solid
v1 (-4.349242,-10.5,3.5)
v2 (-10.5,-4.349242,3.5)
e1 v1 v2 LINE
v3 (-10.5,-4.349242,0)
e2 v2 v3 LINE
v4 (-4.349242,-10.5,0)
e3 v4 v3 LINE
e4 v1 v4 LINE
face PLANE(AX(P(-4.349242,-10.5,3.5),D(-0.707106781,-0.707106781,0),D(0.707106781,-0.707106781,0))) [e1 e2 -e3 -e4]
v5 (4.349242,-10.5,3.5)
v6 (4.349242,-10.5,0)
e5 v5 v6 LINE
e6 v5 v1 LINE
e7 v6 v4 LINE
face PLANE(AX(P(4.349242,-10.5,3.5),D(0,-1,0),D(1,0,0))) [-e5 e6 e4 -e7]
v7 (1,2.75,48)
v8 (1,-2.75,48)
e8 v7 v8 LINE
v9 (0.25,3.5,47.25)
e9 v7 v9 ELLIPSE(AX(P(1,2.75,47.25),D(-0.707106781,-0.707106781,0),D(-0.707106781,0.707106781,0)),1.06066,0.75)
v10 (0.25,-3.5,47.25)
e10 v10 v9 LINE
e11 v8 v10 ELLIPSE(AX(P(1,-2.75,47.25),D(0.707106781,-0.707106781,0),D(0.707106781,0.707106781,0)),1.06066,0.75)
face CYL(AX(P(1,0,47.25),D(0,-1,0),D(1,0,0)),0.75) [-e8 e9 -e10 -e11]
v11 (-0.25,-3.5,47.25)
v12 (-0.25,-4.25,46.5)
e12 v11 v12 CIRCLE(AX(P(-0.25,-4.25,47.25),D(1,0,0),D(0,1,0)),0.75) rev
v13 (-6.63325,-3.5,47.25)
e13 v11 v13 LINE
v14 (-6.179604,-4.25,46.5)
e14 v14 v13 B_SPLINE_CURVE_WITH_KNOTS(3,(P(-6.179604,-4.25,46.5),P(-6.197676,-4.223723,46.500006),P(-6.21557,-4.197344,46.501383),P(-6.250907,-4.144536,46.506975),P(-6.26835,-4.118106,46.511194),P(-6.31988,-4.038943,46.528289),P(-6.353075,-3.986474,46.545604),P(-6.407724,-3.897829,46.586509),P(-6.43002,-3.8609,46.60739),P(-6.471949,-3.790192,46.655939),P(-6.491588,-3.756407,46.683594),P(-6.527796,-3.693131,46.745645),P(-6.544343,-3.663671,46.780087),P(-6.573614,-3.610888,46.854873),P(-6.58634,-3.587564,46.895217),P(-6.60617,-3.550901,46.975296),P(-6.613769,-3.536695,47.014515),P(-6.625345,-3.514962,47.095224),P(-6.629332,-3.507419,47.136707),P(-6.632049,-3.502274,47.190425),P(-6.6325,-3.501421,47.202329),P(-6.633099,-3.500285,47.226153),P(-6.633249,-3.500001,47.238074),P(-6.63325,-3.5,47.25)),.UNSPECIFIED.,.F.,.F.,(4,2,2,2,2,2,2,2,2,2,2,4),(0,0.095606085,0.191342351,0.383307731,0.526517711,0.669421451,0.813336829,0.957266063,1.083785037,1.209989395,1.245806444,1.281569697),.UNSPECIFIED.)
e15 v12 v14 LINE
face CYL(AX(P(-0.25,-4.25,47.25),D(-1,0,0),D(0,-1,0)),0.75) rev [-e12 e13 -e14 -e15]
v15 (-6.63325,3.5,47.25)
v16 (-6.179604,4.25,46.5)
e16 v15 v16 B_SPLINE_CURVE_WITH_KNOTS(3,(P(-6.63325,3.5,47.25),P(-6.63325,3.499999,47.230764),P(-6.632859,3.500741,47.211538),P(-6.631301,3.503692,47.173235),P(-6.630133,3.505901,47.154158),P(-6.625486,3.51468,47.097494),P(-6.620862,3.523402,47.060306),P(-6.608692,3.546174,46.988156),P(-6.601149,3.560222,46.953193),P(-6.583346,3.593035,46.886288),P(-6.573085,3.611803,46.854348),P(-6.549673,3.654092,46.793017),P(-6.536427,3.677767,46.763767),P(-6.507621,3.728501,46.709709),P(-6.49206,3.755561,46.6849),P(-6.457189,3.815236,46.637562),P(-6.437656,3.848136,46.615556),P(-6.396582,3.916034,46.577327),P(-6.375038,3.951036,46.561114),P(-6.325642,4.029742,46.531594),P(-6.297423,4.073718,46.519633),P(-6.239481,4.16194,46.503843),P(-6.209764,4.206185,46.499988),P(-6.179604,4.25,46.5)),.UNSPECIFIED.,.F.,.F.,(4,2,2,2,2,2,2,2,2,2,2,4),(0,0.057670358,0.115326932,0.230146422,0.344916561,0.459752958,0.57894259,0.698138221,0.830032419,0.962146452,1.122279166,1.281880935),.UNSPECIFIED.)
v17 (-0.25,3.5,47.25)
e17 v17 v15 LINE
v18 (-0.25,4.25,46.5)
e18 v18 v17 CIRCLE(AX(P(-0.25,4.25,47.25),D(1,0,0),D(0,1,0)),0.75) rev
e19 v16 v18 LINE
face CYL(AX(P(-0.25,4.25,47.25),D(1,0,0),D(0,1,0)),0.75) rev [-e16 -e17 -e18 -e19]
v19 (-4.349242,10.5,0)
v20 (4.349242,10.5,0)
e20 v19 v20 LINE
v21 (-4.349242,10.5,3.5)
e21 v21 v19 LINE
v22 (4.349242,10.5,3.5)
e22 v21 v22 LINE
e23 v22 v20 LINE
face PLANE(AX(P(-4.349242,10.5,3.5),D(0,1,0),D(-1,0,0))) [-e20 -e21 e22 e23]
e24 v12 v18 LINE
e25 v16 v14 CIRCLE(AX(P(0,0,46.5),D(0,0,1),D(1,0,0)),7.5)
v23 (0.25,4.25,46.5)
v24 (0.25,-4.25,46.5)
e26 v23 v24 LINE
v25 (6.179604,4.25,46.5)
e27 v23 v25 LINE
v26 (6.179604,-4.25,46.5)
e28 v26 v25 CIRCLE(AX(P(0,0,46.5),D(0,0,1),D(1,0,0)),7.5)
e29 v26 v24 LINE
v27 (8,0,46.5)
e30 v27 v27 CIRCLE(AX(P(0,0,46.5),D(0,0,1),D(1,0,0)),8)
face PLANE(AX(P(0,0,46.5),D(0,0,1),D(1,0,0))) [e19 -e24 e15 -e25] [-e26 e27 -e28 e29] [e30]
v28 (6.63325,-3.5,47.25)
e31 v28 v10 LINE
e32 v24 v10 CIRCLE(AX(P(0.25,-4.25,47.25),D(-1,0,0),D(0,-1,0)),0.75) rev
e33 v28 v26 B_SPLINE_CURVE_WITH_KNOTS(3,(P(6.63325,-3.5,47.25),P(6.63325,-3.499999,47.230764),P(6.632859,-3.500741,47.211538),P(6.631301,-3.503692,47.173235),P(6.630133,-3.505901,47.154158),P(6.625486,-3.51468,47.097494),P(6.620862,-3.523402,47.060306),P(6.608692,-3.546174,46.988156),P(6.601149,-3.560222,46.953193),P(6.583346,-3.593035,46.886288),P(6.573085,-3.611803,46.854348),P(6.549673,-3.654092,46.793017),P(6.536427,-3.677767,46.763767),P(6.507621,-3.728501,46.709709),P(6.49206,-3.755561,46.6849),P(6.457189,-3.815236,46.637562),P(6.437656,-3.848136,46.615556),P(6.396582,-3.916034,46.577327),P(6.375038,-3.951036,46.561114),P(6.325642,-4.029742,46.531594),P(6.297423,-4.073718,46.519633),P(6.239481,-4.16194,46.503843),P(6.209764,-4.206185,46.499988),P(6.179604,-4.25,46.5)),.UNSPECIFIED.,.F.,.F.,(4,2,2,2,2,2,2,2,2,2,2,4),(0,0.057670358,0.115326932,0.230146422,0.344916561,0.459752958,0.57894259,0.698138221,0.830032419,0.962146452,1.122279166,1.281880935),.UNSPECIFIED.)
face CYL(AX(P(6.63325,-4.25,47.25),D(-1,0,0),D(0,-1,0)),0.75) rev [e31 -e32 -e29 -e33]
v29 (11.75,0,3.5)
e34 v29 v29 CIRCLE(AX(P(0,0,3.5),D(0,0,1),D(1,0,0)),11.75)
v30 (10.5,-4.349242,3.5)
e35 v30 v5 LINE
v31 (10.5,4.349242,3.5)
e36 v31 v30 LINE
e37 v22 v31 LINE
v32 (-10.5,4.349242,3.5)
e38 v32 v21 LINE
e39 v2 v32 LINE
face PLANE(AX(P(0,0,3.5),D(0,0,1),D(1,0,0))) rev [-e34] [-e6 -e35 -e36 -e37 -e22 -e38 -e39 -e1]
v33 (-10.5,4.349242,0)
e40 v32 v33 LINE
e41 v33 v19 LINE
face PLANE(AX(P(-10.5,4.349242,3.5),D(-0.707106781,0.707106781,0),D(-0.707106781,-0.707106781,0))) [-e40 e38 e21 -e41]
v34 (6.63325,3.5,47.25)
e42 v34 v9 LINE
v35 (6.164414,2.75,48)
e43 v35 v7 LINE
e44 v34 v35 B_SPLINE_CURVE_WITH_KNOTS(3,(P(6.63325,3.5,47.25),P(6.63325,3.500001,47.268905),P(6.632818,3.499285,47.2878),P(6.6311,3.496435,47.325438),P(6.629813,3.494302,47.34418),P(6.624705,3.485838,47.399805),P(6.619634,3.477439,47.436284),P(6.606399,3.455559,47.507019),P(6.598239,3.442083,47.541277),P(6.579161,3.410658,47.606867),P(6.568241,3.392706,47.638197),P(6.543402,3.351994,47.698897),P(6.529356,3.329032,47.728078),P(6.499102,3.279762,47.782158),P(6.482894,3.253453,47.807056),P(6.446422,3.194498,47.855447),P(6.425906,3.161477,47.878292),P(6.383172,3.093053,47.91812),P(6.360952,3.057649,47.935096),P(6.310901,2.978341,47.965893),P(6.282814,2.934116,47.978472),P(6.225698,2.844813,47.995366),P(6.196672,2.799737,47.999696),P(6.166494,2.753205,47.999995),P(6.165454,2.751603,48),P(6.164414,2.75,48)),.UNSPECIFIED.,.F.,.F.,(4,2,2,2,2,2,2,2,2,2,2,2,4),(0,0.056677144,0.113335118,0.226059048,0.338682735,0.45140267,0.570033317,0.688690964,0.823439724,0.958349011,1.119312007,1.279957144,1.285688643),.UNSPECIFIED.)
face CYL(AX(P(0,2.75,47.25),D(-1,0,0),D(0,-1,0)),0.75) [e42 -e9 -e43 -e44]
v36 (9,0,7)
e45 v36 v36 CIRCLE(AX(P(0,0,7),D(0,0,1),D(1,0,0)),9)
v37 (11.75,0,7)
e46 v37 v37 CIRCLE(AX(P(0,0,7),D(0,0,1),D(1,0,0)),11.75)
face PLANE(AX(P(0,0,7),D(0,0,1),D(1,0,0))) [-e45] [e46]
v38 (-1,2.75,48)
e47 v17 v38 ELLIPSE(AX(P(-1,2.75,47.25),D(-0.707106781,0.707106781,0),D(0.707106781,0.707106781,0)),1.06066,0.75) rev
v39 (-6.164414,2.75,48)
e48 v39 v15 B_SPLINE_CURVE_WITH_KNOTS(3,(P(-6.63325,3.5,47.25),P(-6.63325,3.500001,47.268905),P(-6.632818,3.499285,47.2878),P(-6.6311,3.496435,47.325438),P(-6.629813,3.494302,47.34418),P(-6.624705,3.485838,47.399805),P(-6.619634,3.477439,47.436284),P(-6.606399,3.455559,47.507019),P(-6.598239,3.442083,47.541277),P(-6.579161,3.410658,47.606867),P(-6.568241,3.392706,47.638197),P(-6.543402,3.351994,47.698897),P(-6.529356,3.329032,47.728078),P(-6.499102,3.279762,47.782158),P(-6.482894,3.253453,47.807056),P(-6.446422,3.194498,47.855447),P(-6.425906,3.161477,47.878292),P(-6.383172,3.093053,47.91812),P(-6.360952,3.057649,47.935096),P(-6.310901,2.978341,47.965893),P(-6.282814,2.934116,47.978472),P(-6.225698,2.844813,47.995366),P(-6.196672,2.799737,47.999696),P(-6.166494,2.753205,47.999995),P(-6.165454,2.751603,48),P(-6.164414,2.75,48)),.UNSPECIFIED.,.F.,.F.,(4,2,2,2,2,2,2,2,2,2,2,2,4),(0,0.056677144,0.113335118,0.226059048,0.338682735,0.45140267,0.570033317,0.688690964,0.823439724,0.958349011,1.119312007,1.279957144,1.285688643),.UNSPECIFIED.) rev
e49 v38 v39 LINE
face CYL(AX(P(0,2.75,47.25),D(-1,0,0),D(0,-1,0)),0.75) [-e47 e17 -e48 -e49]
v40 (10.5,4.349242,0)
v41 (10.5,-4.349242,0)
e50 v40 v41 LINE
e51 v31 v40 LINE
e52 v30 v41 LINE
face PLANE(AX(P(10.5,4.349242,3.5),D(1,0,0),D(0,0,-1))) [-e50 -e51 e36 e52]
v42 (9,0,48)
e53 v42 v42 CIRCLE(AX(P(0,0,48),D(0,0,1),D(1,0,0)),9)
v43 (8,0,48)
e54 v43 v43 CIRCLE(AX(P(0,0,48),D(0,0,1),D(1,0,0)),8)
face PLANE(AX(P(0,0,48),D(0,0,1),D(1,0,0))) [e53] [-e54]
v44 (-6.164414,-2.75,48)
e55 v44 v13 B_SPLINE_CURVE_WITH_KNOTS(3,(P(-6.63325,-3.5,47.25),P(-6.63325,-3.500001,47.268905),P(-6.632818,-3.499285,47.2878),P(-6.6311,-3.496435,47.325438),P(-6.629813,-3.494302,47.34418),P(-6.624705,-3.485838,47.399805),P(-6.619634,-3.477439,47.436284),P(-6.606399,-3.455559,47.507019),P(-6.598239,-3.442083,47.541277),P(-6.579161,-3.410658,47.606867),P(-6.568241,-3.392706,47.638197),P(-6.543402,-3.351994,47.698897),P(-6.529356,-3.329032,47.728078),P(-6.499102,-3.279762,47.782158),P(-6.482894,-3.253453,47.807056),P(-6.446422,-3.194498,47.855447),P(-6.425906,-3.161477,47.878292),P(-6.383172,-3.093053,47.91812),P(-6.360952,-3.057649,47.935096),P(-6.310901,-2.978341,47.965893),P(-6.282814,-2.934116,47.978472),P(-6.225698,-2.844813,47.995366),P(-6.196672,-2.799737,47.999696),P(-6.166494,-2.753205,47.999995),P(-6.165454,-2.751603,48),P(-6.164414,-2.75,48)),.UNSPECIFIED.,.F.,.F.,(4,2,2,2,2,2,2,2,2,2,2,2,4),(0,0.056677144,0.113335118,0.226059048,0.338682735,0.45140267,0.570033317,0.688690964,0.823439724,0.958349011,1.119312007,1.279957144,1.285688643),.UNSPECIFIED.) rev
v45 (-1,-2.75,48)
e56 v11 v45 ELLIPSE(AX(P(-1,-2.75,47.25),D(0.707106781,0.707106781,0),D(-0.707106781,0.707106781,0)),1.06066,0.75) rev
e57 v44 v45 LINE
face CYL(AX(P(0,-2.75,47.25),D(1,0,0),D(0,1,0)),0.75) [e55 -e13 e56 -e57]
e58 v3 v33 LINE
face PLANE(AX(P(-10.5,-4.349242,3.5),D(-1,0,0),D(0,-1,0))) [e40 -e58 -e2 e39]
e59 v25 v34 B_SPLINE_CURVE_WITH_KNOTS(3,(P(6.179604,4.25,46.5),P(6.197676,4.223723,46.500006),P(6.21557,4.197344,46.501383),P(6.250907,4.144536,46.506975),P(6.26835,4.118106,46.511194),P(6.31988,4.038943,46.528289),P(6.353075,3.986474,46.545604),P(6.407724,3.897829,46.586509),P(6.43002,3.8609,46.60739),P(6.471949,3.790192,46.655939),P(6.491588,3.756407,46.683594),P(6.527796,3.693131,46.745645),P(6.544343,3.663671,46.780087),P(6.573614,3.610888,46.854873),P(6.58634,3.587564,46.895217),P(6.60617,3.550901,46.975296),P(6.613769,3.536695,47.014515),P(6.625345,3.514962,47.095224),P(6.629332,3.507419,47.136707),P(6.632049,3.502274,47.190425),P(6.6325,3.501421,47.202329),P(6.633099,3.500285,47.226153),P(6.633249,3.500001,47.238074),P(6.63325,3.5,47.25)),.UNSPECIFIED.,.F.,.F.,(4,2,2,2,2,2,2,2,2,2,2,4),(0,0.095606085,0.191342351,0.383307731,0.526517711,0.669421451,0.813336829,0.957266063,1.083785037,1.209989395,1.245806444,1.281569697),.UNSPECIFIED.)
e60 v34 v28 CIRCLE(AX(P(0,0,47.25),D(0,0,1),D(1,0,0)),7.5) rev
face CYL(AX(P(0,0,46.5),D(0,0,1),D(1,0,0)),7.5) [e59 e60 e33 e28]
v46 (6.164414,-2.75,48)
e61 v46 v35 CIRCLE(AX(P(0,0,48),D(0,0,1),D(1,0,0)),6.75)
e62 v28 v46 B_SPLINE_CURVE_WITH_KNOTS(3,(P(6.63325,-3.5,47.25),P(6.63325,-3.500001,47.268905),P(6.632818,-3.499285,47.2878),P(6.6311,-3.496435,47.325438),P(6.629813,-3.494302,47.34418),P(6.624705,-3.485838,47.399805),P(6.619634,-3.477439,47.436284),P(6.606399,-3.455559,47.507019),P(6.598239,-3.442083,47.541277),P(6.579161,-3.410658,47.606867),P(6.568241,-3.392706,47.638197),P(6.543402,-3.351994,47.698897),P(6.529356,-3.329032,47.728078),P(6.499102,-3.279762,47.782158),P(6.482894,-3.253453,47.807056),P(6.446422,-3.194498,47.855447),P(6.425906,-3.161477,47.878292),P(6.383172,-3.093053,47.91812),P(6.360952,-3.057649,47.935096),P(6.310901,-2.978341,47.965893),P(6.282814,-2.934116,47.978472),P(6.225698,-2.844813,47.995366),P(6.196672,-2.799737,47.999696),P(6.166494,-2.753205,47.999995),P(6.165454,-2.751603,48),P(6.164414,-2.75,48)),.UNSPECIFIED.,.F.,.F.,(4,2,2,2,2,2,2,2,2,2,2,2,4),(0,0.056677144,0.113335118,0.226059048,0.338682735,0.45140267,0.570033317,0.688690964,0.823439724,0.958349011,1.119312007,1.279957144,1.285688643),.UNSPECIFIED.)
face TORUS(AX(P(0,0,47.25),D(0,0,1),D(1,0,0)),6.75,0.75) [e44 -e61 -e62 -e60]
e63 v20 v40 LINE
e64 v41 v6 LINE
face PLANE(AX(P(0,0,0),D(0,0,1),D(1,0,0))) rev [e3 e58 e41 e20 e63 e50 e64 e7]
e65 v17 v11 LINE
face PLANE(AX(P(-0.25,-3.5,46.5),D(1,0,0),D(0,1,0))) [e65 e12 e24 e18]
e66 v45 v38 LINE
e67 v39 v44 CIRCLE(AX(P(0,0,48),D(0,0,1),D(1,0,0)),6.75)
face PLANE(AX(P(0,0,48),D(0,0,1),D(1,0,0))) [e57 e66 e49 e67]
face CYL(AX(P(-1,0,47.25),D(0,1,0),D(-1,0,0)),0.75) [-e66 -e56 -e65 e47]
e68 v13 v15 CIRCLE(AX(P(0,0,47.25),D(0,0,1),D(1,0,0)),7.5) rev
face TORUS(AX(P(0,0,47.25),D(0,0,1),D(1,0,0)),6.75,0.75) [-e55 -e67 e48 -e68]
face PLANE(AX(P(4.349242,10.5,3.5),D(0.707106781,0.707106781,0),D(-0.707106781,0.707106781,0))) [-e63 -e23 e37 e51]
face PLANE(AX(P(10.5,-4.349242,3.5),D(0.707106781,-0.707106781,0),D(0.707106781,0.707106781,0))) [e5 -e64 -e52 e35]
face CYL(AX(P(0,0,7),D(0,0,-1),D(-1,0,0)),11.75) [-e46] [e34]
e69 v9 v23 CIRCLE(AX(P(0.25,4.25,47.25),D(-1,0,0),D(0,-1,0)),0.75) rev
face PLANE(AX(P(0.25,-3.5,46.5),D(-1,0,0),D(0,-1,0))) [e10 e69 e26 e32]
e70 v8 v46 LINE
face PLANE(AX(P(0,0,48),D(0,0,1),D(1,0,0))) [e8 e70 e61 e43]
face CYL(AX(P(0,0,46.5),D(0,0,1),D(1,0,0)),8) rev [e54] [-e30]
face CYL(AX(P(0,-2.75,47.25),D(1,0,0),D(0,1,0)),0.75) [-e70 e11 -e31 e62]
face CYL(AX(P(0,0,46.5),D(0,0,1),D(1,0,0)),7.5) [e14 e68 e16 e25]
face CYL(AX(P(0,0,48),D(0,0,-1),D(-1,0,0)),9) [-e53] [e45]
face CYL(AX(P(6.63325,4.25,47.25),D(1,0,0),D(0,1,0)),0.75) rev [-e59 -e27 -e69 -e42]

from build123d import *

# Parameters (mm, degrees)
SKETCH_1_R          = 9
EXTRUDE_1_DEPTH     = 48
EXTRUDE_2_DEPTH     = 3.5
SKETCH_3_R          = 11.75
EXTRUDE_3_DEPTH     = 3.5
SKETCH_4_R          = 8
CUT_EXTRUDE_1_DEPTH = 1.5
FILLET_1_R          = 0.75


with BuildPart() as part:
    # 草图1 → 凸台-拉伸1 (new body)
    with BuildSketch(Plane.XY):
        Circle(SKETCH_1_R)
    extrude(amount=EXTRUDE_1_DEPTH)

    # 草图2 → 凸台-拉伸2 (add)
    with BuildSketch(Plane(origin=(0, 0, 0), x_dir=(-1, 0, 0), z_dir=(0, 0, -1))):
        Polygon((-10.5, 4.349242405), (-10.5, -4.349242405), (-4.349242405, -10.5), (4.349242405, -10.5), (10.5, -4.349242405), (10.5, 4.349242405), (4.349242405, 10.5), (-4.349242405, 10.5), align=None)
    extrude(amount=-EXTRUDE_2_DEPTH)

    # 草图3 → 凸台-拉伸3 (add)
    with BuildSketch(Plane.XY.offset(3.5)):
        Circle(SKETCH_3_R)
    extrude(amount=EXTRUDE_3_DEPTH)

    # 草图4 → 切除-拉伸1 (cut)
    with BuildSketch(Plane.XY.offset(48)):
        Circle(SKETCH_4_R)
        with BuildLine():
            Line((6.633249581, -3.5), (0.25, -3.5))
            Line((0.25, -3.5), (0.25, 3.5))
            Line((0.25, 3.5), (6.633249581, 3.5))
            ThreePointArc((6.633249581, 3.5), (7.5, 0), (6.633249581, -3.5))
        make_face(mode=Mode.SUBTRACT)
        with BuildLine():
            Line((-0.25, -3.5), (-0.25, 3.5))
            Line((-0.25, 3.5), (-6.633249581, 3.5))
            ThreePointArc((-6.633249581, 3.5), (-7.5, 0), (-6.633249581, -3.5))
            Line((-6.633249581, -3.5), (-0.25, -3.5))
        make_face(mode=Mode.SUBTRACT)
    extrude(amount=-CUT_EXTRUDE_1_DEPTH, mode=Mode.SUBTRACT)

    # 圆角1
    fillet_1_edges = [part.edges().sort_by_distance(p)[0] for p in [
        (-3.44162479, 3.5, 46.5),
        (-3.44162479, -3.5, 48),
        (-7.5, 0, 48),
        (-0.25, 0, 48),
        (0.25, 0, 48),
        (3.44162479, -3.5, 48),
        (7.5, 0, 48),
        (3.44162479, 3.5, 48),
        (-3.44162479, -3.5, 46.5),
        (3.44162479, -3.5, 46.5),
        (3.44162479, 3.5, 46.5),
        (-3.44162479, 3.5, 48),
    ]]
    fillet(fillet_1_edges, radius=FILLET_1_R - 0.0001)  # a hair under: the kernel refuses the full size


solid = part.part
